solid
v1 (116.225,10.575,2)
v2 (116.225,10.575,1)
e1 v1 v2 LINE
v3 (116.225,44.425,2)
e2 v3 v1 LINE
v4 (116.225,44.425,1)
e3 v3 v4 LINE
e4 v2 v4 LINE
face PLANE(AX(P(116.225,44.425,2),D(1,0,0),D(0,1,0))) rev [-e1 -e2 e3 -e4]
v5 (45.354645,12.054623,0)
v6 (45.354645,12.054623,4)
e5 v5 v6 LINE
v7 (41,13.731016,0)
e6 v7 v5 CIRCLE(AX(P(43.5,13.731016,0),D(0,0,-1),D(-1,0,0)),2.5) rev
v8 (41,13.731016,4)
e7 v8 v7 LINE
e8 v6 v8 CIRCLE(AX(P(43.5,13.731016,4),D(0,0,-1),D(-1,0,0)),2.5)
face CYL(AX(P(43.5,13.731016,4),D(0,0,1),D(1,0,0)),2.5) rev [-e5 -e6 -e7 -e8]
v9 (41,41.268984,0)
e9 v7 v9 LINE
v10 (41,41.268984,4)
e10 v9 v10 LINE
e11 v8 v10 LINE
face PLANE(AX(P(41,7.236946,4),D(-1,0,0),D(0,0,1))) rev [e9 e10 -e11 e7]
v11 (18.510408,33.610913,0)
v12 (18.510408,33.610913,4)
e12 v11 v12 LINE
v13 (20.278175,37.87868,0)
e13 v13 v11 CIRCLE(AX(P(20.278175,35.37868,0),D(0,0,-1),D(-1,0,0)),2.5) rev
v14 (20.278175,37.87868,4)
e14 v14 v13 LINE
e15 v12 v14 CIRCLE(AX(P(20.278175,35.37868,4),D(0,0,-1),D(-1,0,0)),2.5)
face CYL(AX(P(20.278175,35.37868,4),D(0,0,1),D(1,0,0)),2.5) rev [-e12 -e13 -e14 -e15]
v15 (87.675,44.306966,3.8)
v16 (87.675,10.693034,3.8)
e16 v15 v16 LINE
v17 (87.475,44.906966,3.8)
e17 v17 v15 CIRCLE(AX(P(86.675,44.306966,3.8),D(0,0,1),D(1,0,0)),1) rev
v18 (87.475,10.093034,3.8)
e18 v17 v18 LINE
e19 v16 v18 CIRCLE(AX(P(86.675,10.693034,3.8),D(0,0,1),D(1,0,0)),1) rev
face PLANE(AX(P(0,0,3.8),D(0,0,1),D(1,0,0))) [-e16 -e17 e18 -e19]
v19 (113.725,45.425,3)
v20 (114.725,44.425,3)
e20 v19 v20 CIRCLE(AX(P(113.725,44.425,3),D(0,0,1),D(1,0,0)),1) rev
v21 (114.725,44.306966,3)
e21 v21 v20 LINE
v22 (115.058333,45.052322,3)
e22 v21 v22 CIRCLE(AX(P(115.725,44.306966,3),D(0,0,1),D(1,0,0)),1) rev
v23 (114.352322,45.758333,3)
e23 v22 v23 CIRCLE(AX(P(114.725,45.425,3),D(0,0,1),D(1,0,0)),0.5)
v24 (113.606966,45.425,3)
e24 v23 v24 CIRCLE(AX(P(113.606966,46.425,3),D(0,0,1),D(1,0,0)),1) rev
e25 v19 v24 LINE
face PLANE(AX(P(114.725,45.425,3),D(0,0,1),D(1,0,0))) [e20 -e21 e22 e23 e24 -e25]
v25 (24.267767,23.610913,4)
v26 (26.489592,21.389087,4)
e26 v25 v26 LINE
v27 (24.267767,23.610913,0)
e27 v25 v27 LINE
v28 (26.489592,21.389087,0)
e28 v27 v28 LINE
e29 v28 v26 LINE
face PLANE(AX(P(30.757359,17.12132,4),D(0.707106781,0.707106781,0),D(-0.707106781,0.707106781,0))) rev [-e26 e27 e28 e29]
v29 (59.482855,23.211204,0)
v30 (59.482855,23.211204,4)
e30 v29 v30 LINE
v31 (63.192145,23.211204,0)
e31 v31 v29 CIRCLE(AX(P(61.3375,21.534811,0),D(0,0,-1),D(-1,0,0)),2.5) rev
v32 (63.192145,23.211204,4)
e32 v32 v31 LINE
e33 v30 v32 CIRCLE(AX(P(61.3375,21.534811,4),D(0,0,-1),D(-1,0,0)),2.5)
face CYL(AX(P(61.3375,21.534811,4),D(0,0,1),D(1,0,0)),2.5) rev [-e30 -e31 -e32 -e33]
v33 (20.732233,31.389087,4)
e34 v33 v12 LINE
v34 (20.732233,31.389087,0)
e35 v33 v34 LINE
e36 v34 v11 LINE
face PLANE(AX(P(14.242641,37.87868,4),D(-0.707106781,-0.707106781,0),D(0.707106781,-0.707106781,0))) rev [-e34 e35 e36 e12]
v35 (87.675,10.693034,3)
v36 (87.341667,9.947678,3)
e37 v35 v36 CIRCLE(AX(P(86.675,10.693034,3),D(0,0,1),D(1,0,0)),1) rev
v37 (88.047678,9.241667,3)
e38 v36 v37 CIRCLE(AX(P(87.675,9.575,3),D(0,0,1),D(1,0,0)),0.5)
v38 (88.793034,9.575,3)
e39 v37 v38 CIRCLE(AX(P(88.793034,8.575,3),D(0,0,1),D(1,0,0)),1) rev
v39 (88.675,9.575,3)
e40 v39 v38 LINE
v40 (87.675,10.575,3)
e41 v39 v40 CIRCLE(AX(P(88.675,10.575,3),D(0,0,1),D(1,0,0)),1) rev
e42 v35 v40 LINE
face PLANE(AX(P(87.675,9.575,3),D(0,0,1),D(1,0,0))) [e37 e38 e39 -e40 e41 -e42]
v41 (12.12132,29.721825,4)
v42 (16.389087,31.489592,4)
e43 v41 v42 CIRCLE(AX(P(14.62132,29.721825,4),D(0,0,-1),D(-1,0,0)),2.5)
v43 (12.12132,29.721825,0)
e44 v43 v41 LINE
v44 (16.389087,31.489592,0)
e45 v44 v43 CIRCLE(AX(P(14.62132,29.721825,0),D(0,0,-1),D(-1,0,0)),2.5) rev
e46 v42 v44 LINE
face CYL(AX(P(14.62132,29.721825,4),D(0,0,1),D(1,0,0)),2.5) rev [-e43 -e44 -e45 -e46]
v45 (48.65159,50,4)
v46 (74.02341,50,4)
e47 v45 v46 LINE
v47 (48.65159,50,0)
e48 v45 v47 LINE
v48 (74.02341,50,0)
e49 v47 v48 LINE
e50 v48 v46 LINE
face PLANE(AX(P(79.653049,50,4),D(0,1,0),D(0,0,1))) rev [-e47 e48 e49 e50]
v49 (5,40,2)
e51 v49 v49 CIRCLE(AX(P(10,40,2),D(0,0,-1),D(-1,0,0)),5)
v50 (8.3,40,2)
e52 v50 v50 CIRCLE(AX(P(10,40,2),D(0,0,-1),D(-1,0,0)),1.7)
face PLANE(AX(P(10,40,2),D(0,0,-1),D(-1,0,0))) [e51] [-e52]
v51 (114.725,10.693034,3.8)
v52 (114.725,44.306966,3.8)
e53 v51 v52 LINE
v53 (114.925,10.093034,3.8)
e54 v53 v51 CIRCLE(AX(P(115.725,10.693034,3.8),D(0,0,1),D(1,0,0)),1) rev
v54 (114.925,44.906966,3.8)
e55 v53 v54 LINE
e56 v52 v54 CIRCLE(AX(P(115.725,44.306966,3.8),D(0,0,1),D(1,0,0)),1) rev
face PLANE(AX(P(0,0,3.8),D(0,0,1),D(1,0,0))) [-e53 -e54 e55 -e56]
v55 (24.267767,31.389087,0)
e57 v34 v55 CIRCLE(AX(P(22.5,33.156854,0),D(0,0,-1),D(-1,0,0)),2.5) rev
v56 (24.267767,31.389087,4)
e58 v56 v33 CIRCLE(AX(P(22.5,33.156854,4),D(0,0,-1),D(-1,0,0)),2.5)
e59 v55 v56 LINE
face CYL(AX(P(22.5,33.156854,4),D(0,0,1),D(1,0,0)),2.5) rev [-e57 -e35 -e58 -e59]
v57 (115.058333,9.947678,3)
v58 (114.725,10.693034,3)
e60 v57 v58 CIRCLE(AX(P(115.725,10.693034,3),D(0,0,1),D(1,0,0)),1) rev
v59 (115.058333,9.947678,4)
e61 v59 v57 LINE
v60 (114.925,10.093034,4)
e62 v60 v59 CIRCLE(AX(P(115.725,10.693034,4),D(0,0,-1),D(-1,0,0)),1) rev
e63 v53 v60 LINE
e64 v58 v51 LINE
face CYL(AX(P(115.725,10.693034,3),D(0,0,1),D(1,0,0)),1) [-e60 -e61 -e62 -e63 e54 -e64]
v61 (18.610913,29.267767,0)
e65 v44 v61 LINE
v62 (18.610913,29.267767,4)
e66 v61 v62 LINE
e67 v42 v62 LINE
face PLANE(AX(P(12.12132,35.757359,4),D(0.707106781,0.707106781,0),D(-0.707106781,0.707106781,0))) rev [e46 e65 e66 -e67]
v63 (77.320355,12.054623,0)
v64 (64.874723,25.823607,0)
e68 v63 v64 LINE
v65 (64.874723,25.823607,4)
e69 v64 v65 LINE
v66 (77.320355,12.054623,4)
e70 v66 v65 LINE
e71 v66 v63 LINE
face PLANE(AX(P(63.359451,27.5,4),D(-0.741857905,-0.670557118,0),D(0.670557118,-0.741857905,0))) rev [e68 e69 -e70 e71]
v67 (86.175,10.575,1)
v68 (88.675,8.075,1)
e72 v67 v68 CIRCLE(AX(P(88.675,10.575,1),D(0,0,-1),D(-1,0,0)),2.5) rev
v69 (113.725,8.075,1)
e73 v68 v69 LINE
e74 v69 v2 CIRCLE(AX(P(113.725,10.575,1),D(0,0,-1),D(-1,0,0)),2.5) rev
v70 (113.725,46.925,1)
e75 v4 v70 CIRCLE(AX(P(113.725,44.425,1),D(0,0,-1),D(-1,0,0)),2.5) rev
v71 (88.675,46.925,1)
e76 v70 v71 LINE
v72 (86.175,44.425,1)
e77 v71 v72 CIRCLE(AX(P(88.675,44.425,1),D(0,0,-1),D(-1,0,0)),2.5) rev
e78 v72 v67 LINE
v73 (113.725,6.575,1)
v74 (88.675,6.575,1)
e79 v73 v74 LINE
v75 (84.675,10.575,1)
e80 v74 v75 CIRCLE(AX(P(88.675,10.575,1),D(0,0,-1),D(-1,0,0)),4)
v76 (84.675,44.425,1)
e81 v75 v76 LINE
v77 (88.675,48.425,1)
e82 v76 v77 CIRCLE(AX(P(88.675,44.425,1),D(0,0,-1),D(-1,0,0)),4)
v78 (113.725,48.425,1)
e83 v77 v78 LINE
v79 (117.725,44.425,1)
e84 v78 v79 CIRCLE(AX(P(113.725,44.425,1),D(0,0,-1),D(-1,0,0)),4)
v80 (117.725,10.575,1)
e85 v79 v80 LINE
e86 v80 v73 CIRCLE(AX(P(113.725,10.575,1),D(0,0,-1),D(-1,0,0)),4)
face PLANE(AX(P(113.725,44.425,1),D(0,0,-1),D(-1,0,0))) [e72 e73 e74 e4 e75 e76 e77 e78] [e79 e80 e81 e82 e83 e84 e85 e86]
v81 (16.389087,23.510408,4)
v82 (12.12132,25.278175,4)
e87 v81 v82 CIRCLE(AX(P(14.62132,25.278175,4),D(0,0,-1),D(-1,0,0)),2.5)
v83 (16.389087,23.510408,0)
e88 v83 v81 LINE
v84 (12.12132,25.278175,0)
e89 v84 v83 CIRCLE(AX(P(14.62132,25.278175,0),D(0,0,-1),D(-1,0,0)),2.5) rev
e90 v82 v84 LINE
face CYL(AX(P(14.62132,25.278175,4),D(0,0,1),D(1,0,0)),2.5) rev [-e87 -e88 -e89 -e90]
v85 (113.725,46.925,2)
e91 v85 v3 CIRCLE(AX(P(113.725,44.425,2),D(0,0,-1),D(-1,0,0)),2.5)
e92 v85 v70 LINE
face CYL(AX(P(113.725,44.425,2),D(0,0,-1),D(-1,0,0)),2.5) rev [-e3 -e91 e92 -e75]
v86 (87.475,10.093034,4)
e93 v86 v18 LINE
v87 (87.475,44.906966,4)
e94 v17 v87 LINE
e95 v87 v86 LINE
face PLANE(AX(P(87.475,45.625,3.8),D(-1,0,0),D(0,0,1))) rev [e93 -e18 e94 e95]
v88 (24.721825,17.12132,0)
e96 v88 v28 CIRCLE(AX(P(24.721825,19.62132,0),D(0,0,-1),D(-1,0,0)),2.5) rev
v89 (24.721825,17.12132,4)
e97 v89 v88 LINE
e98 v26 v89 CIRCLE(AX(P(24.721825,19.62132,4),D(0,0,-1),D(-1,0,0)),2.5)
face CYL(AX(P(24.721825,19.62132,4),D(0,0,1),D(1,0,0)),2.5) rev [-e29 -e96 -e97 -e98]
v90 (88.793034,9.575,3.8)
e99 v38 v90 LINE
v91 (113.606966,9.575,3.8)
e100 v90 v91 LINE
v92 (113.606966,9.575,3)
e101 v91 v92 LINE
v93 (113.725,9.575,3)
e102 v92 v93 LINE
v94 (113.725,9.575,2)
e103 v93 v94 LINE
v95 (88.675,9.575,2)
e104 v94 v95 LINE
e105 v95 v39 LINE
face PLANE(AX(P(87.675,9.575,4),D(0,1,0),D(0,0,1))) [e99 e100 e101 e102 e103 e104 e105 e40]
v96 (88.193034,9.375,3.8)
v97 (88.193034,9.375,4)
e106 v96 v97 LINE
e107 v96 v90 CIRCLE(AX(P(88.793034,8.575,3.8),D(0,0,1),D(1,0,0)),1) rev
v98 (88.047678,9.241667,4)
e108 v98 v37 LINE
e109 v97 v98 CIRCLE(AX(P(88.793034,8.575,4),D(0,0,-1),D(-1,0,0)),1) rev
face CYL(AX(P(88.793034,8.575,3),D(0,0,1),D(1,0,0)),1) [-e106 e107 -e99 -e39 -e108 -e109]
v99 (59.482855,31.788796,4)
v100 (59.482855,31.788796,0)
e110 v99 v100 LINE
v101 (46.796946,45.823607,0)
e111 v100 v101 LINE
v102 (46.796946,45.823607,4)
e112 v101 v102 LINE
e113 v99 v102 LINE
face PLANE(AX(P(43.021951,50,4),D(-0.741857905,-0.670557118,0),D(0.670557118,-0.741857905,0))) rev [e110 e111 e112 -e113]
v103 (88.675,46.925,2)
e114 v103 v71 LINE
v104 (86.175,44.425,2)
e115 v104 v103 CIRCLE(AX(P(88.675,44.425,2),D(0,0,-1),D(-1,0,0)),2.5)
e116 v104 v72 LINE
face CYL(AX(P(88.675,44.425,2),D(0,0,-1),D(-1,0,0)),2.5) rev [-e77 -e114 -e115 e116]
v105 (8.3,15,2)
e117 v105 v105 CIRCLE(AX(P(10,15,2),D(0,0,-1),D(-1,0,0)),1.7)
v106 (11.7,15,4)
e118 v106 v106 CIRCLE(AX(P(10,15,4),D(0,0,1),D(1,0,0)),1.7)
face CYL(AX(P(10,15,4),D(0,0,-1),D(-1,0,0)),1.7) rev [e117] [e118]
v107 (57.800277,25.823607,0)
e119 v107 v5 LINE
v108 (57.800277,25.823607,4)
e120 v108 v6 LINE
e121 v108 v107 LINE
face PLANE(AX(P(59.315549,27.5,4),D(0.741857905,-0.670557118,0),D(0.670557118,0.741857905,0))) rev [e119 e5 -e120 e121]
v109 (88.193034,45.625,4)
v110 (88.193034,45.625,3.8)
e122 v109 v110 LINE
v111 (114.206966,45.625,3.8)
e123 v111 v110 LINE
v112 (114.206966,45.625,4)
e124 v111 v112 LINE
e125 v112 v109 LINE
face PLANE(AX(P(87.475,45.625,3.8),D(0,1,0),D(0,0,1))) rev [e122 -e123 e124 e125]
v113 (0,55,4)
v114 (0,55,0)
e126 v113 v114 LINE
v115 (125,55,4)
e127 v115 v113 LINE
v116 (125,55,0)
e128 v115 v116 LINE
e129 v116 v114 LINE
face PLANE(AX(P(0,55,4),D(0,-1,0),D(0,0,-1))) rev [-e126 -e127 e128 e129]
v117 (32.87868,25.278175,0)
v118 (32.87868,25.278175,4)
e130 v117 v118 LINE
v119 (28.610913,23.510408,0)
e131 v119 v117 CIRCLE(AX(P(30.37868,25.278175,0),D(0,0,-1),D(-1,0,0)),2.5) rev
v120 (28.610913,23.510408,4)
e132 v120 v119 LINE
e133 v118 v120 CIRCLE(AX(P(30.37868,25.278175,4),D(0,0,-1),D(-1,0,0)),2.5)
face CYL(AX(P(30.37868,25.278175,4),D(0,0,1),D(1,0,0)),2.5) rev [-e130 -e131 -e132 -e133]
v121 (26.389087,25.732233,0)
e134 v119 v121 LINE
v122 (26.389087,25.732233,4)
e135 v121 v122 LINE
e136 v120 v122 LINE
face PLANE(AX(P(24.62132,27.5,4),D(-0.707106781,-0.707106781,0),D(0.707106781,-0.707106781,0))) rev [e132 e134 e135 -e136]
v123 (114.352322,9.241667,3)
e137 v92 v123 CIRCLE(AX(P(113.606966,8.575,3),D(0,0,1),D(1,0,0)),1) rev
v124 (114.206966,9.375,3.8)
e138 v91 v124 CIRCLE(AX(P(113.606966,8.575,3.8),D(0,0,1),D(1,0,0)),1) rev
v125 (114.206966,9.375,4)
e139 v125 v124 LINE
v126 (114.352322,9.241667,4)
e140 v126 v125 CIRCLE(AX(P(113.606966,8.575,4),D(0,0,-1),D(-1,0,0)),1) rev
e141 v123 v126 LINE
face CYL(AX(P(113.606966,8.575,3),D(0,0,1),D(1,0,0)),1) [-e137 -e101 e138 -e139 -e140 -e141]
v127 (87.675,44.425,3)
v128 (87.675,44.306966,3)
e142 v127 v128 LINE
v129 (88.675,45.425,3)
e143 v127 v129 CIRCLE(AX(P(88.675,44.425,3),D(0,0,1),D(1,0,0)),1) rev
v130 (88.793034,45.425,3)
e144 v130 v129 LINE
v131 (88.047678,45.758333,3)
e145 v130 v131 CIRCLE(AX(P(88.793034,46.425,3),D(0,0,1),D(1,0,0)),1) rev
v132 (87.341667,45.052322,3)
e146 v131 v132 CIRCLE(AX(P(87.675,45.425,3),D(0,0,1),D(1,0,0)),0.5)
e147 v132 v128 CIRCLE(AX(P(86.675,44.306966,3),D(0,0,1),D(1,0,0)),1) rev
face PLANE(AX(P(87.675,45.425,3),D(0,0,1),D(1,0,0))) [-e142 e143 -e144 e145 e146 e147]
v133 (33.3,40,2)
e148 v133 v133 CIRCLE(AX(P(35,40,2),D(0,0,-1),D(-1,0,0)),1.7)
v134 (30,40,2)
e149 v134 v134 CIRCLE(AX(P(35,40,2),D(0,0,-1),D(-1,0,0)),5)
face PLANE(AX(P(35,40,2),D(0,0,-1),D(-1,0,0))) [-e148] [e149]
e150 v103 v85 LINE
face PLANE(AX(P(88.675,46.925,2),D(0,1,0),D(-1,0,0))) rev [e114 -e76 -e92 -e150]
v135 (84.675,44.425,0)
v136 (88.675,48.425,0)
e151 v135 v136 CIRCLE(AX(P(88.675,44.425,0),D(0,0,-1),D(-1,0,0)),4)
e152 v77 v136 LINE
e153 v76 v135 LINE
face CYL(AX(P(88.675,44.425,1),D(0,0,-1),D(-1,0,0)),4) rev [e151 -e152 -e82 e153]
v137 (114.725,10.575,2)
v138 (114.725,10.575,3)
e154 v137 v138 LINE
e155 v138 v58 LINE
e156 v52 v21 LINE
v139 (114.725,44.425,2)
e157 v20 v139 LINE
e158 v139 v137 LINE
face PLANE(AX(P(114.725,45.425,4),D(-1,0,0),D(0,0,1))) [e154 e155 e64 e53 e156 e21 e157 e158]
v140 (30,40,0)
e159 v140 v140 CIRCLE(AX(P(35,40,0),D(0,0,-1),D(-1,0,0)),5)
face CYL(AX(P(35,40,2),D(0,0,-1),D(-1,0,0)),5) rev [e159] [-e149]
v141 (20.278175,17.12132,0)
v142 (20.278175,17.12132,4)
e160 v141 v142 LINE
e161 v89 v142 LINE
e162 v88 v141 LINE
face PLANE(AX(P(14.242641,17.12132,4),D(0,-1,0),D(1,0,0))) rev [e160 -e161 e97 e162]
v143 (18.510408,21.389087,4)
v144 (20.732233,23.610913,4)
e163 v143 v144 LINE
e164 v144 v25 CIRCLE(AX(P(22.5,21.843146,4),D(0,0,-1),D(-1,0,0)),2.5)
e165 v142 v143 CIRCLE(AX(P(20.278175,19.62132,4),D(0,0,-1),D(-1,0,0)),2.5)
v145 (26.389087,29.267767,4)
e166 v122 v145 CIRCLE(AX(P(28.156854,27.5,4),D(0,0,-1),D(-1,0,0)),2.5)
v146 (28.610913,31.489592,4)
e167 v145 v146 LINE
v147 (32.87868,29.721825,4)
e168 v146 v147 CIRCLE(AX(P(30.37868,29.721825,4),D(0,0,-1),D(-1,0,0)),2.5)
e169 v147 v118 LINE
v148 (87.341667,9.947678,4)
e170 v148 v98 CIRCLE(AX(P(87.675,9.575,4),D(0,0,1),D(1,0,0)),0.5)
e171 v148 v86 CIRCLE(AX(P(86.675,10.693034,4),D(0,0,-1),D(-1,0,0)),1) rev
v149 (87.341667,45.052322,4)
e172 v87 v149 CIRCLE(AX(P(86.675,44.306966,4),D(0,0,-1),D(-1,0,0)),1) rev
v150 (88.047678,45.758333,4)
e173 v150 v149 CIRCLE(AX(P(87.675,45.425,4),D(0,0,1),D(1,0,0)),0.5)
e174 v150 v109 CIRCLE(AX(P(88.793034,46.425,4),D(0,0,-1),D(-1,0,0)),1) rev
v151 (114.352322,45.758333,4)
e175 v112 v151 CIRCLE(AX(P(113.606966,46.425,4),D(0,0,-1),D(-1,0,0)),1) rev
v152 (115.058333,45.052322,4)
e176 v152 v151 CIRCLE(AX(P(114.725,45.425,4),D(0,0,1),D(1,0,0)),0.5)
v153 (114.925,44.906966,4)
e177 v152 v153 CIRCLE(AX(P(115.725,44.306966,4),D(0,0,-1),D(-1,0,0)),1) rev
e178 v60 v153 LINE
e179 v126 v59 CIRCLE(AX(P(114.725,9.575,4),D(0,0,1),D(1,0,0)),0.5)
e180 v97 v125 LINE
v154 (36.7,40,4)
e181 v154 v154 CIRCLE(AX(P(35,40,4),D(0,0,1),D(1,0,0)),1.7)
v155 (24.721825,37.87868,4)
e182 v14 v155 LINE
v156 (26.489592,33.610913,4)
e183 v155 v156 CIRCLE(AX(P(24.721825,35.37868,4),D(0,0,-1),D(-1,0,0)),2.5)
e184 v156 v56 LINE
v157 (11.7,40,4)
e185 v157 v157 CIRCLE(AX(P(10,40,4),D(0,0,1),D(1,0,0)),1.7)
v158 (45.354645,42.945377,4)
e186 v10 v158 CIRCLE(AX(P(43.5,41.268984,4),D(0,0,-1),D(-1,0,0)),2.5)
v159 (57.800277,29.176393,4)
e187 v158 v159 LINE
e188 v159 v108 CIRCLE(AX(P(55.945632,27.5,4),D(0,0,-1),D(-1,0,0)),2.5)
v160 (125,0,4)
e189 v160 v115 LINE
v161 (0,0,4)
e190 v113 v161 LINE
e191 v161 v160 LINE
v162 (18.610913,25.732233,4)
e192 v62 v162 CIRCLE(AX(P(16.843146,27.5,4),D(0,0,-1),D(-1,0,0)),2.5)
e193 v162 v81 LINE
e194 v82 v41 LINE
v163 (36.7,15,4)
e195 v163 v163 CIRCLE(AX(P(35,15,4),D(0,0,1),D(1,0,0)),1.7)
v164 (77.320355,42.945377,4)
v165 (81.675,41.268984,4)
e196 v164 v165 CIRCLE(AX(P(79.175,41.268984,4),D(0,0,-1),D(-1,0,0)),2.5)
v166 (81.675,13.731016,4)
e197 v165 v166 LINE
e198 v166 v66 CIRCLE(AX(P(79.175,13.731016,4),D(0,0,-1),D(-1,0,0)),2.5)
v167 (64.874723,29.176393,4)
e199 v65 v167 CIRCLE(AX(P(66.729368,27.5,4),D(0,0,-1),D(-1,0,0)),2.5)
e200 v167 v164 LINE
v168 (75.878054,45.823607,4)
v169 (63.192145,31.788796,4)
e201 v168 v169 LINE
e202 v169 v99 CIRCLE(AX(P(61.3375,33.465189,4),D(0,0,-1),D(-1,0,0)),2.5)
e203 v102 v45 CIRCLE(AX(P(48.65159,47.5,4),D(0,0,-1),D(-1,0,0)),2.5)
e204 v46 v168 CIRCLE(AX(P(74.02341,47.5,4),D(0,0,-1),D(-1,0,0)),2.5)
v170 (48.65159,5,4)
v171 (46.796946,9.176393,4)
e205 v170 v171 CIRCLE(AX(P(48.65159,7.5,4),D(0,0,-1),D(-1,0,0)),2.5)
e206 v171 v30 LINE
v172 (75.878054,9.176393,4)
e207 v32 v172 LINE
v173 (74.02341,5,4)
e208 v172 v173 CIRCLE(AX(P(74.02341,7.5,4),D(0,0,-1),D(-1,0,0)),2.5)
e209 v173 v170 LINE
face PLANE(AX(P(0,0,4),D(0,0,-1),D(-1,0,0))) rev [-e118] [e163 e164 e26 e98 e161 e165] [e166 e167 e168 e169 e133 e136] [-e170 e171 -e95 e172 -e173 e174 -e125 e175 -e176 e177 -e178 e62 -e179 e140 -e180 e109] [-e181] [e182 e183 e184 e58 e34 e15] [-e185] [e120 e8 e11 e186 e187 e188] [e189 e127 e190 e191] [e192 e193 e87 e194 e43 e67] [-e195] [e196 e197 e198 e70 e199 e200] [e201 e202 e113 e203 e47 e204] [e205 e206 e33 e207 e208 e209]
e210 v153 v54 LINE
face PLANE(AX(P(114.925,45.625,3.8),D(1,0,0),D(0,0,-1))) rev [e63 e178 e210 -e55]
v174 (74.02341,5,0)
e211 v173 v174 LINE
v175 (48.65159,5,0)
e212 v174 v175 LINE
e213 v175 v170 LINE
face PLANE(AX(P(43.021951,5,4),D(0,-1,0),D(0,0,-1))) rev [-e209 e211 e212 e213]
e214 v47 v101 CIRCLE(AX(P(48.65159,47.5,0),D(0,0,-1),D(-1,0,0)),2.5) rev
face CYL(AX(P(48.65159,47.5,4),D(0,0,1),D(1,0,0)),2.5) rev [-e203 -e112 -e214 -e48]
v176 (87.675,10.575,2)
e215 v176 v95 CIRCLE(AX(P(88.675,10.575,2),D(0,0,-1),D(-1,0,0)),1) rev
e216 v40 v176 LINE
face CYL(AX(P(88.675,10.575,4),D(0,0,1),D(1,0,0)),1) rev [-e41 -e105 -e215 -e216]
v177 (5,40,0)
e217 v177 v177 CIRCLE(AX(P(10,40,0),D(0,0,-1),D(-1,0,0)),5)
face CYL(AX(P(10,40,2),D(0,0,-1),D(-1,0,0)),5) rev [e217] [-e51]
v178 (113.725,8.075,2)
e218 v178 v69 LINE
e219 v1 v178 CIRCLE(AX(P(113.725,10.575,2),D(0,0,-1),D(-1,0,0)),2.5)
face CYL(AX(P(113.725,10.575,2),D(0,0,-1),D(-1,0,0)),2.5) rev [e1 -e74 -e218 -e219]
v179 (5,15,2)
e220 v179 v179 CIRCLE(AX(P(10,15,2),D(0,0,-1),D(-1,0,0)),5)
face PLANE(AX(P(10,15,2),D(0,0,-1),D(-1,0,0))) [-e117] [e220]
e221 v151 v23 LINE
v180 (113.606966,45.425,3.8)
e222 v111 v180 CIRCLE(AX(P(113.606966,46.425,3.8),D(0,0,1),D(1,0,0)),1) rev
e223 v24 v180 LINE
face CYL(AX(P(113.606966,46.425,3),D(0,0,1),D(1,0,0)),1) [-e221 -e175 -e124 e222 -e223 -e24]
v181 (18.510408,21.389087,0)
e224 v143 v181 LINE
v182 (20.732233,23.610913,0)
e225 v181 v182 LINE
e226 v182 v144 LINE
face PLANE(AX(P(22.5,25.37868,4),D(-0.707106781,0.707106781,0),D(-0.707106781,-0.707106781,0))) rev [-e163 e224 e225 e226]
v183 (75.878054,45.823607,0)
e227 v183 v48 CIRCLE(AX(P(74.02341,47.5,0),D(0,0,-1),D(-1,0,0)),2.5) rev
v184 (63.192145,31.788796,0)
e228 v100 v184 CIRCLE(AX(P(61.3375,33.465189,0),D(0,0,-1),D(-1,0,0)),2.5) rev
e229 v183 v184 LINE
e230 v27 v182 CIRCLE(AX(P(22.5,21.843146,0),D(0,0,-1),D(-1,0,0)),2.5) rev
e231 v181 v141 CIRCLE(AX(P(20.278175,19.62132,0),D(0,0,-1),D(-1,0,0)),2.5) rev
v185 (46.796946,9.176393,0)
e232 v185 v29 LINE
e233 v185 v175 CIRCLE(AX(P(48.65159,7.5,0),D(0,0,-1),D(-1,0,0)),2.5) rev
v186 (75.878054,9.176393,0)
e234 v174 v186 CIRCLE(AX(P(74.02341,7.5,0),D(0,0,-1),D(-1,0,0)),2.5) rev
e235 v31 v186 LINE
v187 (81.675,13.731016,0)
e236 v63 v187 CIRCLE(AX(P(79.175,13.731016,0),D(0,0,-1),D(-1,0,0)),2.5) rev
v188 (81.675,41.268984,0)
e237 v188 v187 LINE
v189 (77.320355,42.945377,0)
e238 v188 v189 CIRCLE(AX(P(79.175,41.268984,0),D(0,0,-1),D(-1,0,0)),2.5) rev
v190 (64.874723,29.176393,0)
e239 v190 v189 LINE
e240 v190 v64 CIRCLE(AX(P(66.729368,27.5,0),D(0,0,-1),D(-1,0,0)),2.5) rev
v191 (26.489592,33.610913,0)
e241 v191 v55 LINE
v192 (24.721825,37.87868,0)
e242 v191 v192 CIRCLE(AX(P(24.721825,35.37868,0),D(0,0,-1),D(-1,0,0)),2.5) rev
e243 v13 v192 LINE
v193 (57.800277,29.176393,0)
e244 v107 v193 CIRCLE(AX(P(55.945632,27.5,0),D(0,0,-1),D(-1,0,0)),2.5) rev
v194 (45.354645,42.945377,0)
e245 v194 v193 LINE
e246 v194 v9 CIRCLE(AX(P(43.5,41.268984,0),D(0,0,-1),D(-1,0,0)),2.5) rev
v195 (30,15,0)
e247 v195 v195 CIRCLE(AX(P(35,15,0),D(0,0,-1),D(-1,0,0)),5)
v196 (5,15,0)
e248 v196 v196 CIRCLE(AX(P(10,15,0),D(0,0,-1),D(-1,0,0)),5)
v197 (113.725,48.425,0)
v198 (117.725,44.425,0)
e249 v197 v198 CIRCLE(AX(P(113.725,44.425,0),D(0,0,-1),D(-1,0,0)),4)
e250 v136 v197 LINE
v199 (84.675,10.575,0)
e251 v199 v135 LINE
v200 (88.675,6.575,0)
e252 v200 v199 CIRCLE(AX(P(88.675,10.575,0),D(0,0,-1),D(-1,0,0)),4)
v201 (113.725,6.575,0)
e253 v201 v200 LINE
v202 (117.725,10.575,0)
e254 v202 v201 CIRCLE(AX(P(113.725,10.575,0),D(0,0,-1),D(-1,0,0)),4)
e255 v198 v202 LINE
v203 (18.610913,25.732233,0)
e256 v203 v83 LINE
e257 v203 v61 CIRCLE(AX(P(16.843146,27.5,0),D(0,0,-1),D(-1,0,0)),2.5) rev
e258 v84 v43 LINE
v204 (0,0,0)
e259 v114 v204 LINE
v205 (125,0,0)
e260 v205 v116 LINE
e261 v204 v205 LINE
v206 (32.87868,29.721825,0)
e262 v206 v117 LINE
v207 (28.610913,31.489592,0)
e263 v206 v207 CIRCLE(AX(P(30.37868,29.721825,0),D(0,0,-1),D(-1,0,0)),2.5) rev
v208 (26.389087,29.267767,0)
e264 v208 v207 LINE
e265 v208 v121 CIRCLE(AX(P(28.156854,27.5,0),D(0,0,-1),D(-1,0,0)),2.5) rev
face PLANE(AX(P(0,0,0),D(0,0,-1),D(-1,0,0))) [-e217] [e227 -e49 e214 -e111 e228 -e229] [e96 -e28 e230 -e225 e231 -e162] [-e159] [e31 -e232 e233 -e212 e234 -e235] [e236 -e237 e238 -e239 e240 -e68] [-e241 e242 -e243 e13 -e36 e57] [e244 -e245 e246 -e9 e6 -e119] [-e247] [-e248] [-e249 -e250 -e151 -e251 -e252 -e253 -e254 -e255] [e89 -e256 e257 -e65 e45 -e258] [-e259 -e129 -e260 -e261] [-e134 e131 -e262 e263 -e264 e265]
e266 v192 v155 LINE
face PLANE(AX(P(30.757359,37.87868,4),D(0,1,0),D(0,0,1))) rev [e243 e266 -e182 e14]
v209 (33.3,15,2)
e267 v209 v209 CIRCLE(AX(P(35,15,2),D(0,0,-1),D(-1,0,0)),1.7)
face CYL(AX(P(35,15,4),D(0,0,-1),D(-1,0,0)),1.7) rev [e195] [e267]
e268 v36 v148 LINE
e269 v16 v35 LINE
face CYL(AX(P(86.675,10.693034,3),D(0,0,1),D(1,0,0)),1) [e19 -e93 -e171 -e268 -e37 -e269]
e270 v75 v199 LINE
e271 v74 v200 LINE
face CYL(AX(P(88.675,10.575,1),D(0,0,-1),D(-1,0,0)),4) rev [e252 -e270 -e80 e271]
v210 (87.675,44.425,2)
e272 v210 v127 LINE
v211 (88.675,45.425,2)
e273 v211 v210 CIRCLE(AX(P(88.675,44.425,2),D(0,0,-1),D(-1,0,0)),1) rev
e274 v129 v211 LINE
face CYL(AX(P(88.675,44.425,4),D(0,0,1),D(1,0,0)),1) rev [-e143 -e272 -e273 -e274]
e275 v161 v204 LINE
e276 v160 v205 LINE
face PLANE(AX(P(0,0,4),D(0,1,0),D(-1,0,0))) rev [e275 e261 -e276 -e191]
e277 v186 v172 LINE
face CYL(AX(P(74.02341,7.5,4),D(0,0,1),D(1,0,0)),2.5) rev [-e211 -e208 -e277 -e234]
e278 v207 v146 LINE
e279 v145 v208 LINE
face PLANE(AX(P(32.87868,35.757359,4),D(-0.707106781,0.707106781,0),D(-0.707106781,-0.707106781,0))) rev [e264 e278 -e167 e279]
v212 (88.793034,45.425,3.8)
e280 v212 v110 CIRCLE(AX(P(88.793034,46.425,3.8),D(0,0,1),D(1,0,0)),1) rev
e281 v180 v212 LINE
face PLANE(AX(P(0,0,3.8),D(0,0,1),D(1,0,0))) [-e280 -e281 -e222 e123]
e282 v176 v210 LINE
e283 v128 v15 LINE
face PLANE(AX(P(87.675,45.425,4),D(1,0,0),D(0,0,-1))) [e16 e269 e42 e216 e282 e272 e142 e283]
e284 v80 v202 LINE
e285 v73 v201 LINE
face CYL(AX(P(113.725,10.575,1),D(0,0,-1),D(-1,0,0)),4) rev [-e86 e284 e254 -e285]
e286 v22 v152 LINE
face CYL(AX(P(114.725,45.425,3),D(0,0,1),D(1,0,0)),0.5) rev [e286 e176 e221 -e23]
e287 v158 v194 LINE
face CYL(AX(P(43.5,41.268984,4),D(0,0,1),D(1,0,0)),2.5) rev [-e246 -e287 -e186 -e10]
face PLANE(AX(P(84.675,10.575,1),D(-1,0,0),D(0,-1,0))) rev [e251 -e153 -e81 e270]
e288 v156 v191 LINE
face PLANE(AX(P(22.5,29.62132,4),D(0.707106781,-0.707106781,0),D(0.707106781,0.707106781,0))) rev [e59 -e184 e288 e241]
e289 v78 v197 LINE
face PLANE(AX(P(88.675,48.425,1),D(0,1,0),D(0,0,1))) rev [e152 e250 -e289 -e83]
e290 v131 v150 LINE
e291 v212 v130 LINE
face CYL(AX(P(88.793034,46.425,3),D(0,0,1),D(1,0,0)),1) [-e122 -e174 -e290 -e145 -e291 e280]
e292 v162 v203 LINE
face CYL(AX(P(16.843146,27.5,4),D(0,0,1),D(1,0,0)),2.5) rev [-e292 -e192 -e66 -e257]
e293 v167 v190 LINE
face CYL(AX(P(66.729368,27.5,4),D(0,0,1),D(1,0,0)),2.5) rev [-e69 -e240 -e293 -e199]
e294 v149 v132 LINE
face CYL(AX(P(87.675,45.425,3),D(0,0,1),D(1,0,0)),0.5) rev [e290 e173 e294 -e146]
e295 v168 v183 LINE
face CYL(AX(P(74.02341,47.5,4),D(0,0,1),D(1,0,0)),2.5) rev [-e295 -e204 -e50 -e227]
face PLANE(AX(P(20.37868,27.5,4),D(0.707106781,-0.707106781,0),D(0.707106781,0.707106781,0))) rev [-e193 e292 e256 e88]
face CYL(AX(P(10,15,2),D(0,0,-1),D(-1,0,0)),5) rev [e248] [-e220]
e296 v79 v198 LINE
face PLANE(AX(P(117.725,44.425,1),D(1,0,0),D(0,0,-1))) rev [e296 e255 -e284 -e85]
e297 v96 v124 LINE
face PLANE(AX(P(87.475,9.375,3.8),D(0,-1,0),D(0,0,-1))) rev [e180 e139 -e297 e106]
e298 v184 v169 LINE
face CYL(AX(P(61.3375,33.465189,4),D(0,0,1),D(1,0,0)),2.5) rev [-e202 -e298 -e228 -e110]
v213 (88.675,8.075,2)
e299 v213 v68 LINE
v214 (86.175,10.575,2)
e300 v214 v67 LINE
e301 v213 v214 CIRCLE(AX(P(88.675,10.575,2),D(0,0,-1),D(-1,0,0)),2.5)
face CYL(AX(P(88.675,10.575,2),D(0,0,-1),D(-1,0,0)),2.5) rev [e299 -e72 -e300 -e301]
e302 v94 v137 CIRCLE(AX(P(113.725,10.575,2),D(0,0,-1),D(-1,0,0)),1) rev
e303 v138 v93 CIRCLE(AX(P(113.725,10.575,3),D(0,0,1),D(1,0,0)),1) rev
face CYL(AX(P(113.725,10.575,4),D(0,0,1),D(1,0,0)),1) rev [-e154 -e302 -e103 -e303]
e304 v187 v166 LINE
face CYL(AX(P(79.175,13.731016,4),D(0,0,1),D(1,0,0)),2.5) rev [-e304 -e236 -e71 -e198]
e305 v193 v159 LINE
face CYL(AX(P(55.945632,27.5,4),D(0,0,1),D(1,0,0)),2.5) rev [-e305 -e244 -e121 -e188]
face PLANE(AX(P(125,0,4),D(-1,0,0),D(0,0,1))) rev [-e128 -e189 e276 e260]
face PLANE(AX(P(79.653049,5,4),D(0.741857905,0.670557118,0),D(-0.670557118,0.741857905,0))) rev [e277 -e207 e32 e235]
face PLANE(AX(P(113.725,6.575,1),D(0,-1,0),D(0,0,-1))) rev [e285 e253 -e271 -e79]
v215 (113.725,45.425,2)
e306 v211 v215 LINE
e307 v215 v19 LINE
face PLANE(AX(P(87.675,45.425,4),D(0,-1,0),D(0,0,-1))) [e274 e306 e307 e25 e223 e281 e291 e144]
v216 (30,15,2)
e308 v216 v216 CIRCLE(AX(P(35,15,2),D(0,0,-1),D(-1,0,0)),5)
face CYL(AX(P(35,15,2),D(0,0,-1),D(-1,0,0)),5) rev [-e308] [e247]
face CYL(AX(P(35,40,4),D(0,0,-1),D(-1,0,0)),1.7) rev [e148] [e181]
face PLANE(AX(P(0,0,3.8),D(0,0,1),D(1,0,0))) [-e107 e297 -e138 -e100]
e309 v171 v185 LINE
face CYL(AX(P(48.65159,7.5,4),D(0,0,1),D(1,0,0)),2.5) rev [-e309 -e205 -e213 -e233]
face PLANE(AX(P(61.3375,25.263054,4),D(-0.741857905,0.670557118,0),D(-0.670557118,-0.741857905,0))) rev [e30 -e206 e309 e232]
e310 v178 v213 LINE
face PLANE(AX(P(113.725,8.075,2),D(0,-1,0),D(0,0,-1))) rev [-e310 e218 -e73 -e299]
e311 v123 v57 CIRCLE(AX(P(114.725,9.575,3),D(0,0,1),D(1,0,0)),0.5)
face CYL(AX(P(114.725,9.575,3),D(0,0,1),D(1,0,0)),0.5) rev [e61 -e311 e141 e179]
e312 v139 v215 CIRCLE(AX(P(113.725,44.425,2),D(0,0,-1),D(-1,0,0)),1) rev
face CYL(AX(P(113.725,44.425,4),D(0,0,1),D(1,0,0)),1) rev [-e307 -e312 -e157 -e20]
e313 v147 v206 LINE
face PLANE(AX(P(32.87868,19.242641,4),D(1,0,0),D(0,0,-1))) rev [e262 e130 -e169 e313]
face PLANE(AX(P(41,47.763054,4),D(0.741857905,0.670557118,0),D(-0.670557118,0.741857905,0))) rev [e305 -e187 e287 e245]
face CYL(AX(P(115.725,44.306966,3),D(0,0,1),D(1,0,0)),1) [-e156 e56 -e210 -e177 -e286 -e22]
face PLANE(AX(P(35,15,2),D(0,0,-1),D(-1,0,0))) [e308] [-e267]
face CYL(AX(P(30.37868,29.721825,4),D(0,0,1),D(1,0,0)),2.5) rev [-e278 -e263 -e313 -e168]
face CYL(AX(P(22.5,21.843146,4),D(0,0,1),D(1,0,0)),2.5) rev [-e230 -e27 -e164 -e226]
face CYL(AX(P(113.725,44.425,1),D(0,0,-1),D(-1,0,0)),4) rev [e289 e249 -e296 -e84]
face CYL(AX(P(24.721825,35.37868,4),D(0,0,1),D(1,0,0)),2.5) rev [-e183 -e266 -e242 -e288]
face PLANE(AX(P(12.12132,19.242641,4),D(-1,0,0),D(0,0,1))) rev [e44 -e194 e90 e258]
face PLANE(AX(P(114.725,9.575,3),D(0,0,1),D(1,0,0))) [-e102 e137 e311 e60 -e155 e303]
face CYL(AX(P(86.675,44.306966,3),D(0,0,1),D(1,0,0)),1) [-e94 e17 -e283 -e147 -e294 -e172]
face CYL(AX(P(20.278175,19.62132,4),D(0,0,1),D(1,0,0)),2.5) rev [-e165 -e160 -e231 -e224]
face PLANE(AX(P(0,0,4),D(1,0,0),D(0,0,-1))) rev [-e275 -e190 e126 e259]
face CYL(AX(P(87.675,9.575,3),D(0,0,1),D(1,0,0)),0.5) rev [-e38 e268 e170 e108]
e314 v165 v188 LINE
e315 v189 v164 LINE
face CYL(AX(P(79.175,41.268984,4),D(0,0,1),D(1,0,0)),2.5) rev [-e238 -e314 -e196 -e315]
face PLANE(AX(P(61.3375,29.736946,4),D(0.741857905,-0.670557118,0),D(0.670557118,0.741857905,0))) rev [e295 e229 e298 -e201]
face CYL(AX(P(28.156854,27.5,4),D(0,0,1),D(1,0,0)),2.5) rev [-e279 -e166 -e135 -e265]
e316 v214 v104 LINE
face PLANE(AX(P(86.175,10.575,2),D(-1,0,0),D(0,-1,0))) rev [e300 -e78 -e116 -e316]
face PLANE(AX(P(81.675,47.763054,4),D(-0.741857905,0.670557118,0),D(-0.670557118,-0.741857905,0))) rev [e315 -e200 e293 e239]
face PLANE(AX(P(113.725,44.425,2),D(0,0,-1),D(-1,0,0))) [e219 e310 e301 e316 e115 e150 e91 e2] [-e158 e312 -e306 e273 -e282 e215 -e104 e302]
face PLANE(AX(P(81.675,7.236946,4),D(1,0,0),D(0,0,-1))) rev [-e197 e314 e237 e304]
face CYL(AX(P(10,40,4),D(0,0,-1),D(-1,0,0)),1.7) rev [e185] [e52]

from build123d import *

# Parameters (mm, degrees)
SKETCH1_R           = 1.6999999999999995
SKETCH1_W           = 27.05000000000001
SKETCH1_H           = 35.849999999999994
BOSS_EXTRUDE1_DEPTH = 4
SKETCH2_R           = 0.49999999999999917
CUT_EXTRUDE1_DEPTH  = 1
FILLET1_R           = 1
FILLET2_R           = 1
SKETCH7_W           = 27.450000000000074
SKETCH7_H           = 36.250000000000014
CUT_EXTRUDE2_DEPTH  = 0.2
CUT_EXTRUDE3_DEPTH  = 2
CUT_EXTRUDE4_DEPTH  = 1
CUT_EXTRUDE5_DEPTH  = 137.6235704408284
CUT_EXTRUDE6_DEPTH  = 137.6235704408284
FILLET3_R           = 2.5
SKETCH12_R          = 4.999999999999999
SKETCH12_R_2        = 5.000000000000001
CUT_EXTRUDE7_DEPTH  = 2


with BuildPart() as part:
    # Sketch1 → Boss-Extrude1 (new body)
    with BuildSketch(Plane.XY):
        Polygon((0, 0), (125, 2.776e-14), (125, 54.99999999999999), (0, 54.99999999999999), align=None)
        with Locations((10, 39.99999999999999)):
            Circle(SKETCH1_R, mode=Mode.SUBTRACT)
        with Locations((35, 39.999999999999986)):
            Circle(SKETCH1_R, mode=Mode.SUBTRACT)
        with Locations((10, 15)):
            Circle(SKETCH1_R, mode=Mode.SUBTRACT)
        with Locations((35, 15.000000000000014)):
            Circle(SKETCH1_R, mode=Mode.SUBTRACT)
        with Locations((101.2, 27.500000000000007)):
            Rectangle(SKETCH1_W, SKETCH1_H, mode=Mode.SUBTRACT)
    extrude(amount=BOSS_EXTRUDE1_DEPTH)

    # Sketch2 → Cut-Extrude1 (cut)
    with BuildSketch(Plane.XY.offset(4)):
        with Locations((87.675, 45.425000000000004)):
            Circle(SKETCH2_R)
        with Locations((114.72500000000001, 45.425000000000004)):
            Circle(SKETCH2_R)
        with Locations((87.675, 9.575000000000006)):
            Circle(SKETCH2_R)
        with Locations((114.72500000000001, 9.575000000000006)):
            Circle(SKETCH2_R)
    extrude(amount=-CUT_EXTRUDE1_DEPTH, mode=Mode.SUBTRACT)

    # Fillet1
    # the kernel refuses this fillet: 1 mm, written as the material it adds along each edge
    with BuildSketch(Plane(origin=(114.72500000000001, 9.575000000000006, 0), x_dir=(-1, 0, 0), z_dir=(0, 0, 1))) as fillet1_piece_1_section:
        with BuildLine():
            CenterArc((FILLET1_R, -FILLET1_R), FILLET1_R, 90, 90.00000000000023)
            Line((0, -FILLET1_R), (0, 0))
            Line((0, 0), (FILLET1_R, 0))
        make_face()
    fillet1_piece_1 = extrude(amount=5.500000000000009, mode=Mode.PRIVATE)
    fillet1_piece_1 = split(fillet1_piece_1, bisect_by=Plane(origin=(114.10706425748403, 9.617383677219156, 4), z_dir=(0, 0, -1)), keep=Keep.TOP, mode=Mode.PRIVATE)
    fillet1_piece_1 = fillet1_piece_1 - Plane(origin=(114.72500000000001, 9.575000000000006, 1.5000000000000009), x_dir=(1, 0, 0), z_dir=(0, 0, 1)) * Cylinder(0.49999999999999917, 16, mode=Mode.PRIVATE)
    add(fillet1_piece_1)
    with BuildSketch(Plane(origin=(114.72500000000001, 9.575000000000006, 0), x_dir=(-1, 0, 0), z_dir=(0, 0, 1))) as fillet1_piece_2:
        with BuildLine():
            CenterArc((FILLET1_R, -FILLET1_R), FILLET1_R, 90, 90.00000000000023)
            Line((0, -FILLET1_R), (0, 0))
            Line((0, 0), (FILLET1_R, 0))
        make_face()
    extrude(amount=3)
    with BuildSketch(Plane(origin=(87.675, 9.575000000000006, 0), x_dir=(0, 1, 0), z_dir=(0, 0, 1))) as fillet1_piece_3_section:
        with BuildLine():
            CenterArc((FILLET1_R, -FILLET1_R), FILLET1_R, 90, 90)
            Line((0, -FILLET1_R), (0, 0))
            Line((0, 0), (FILLET1_R, 0))
        make_face()
    fillet1_piece_3 = extrude(amount=5.5, mode=Mode.PRIVATE)
    fillet1_piece_3 = split(fillet1_piece_3, bisect_by=Plane(origin=(87.71738367721915, 10.192935742515996, 4), z_dir=(0, 0, -1)), keep=Keep.TOP, mode=Mode.PRIVATE)
    fillet1_piece_3 = fillet1_piece_3 - Plane(origin=(87.675, 9.575000000000006, 1.5000000000000022), x_dir=(1, 0, 0), z_dir=(0, 0, 1)) * Cylinder(0.49999999999999917, 15, mode=Mode.PRIVATE)
    add(fillet1_piece_3)
    with BuildSketch(Plane(origin=(87.675, 9.575000000000006, 0), x_dir=(0, 1, 0), z_dir=(0, 0, 1))) as fillet1_piece_4:
        with BuildLine():
            CenterArc((FILLET1_R, -FILLET1_R), FILLET1_R, 90, 90)
            Line((0, -FILLET1_R), (0, 0))
            Line((0, 0), (FILLET1_R, 0))
        make_face()
    extrude(amount=3)
    with BuildSketch(Plane(origin=(114.72500000000001, 45.425000000000004, 0), x_dir=(0, -1, 0), z_dir=(0, 0, 1))) as fillet1_piece_5_section:
        with BuildLine():
            CenterArc((FILLET1_R, -FILLET1_R), FILLET1_R, 90, 90)
            Line((0, -FILLET1_R), (0, 0))
            Line((0, 0), (FILLET1_R, 0))
        make_face()
    fillet1_piece_5 = extrude(amount=5.5, mode=Mode.PRIVATE)
    fillet1_piece_5 = split(fillet1_piece_5, bisect_by=Plane(origin=(114.68261632278086, 44.807064257484015, 4), z_dir=(0, 0, -1)), keep=Keep.TOP, mode=Mode.PRIVATE)
    fillet1_piece_5 = fillet1_piece_5 - Plane(origin=(114.72500000000001, 45.425000000000004, 1.5000000000000009), x_dir=(1, 0, 0), z_dir=(0, 0, 1)) * Cylinder(0.49999999999999917, 15, mode=Mode.PRIVATE)
    add(fillet1_piece_5)
    with BuildSketch(Plane(origin=(114.72500000000001, 45.425000000000004, 0), x_dir=(0, -1, 0), z_dir=(0, 0, 1))) as fillet1_piece_6:
        with BuildLine():
            CenterArc((FILLET1_R, -FILLET1_R), FILLET1_R, 90, 90)
            Line((0, -FILLET1_R), (0, 0))
            Line((0, 0), (FILLET1_R, 0))
        make_face()
    extrude(amount=3)
    with BuildSketch(Plane(origin=(87.675, 45.425000000000004, 0), x_dir=(0, -1, 0), z_dir=(0, 0, 1))) as fillet1_piece_7_section:
        with BuildLine():
            CenterArc((FILLET1_R, FILLET1_R), FILLET1_R, 180, 90)
            Line((7.11e-15, FILLET1_R), (0, 0))
            Line((0, 0), (FILLET1_R, 0))
        make_face()
    fillet1_piece_7 = extrude(amount=5.500000000000018, mode=Mode.PRIVATE)
    fillet1_piece_7 = split(fillet1_piece_7, bisect_by=Plane(origin=(87.71738367721916, 44.807064257484015, 4), z_dir=(0, 0, -1)), keep=Keep.TOP, mode=Mode.PRIVATE)
    fillet1_piece_7 = fillet1_piece_7 - Plane(origin=(87.675, 45.425000000000004, 1.5), x_dir=(1, 0, 0), z_dir=(0, 0, 1)) * Cylinder(0.49999999999999917, 16, mode=Mode.PRIVATE)
    add(fillet1_piece_7)
    with BuildSketch(Plane(origin=(87.675, 45.425000000000004, 0), x_dir=(0, -1, 0), z_dir=(0, 0, 1))) as fillet1_piece_8:
        with BuildLine():
            CenterArc((FILLET1_R, FILLET1_R), FILLET1_R, 180, 90)
            Line((7.11e-15, FILLET1_R), (0, 0))
            Line((0, 0), (FILLET1_R, 0))
        make_face()
    extrude(amount=3)

    # Fillet2
    # the kernel refuses this fillet: 1 mm, written as the material it takes off along each edge
    with BuildSketch(Plane(origin=(114.24714054305846, 9.722140543058465, 5.642166576865002), x_dir=(-0.9745882982080014, -0.22400368076447263, 0), z_dir=(0, 0, -1))) as fillet2_piece_1:
        with BuildLine():
            CenterArc((0.8808703115104601, -0.9745882982080014), FILLET2_R, 102.94429793424341, 48.189685104221226)
            Line((0.00511929604450839, -0.49182525186917403), (-0.08245580550209228, -0.44354894723529276))
            ThreePointArc((-0.08245580550209228, -0.44354894723529276), (-0.03277787842748482, -0.24628044612821973), (-0.08655124233769046, -0.05008874573995264))
            Line((-0.08655124233769046, -0.05008874573995264), (0.03178284057550912, 0.09481482502727105))
            ThreePointArc((0.03178284057550912, 0.09481482502727105), (0.5194317184430866, 0.07101878188551296), (0.6344662626695403, 0.09745882982079979))
            Line((0.6344662626695403, 0.09745882982079979), (0.6568666307459875, 0))
        make_face()
    extrude(amount=2.6421665768650016, mode=Mode.SUBTRACT)
    with BuildSketch(Plane(origin=(114.57785945694152, 10.052859456941535, 5.642166576864939), x_dir=(0.22400368076451158, 0.9745882982079924, 0), z_dir=(0, 0, -1))) as fillet2_piece_2:
        with BuildLine():
            CenterArc((0.880870311510496, 0.9745882982079924), FILLET2_R, 208.86601696153332, 48.189685104220985)
            Line((0.00511929604452377, 0.49182525186919485), (-0.08245580550207285, 0.44354894723531935))
            ThreePointArc((-0.08245580550207285, 0.44354894723531935), (-0.03277787842748298, 0.2462804461282338), (-0.08655124233769111, 0.05008874573996035))
            Line((-0.08655124233769111, 0.05008874573996035), (0.03178284057550186, -0.09481482502727152))
            ThreePointArc((0.03178284057550186, -0.09481482502727152), (0.5194317184430818, -0.0710187818855023), (0.6344662626695345, -0.09745882982079371))
            Line((0.6344662626695345, -0.09745882982079371), (0.6568666307459844, -1e-17))
        make_face()
    extrude(amount=2.6421665768649394, mode=Mode.SUBTRACT)
    with BuildSketch(Plane(origin=(87.82214054305847, 10.052859456941533, 5.6421665768649705), x_dir=(-0.22400368076448748, 0.974588298207998, 0), z_dir=(0, 0, -1))) as fillet2_piece_3:
        with BuildLine():
            CenterArc((0.8808703115104791, -0.9745882982079979), FILLET2_R, 102.94429793424429, 48.189685104221056)
            Line((0.00511929604451708, -0.49182525186917914), (-0.08245580550207834, -0.4435489472353014))
            ThreePointArc((-0.08245580550207834, -0.4435489472353014), (-0.03277787842748734, -0.24628044612823258), (-0.08655124233769235, -0.05008874573995822))
            Line((-0.08655124233769235, -0.05008874573995822), (0.03178284057550421, 0.09481482502727073))
            ThreePointArc((0.03178284057550421, 0.09481482502727073), (0.5194317184430803, 0.07101878188550331), (0.6344662626695442, 0.09745882982079428))
            Line((0.6344662626695442, 0.09745882982079428), (0.6568666307459916, 1e-17))
        make_face()
    extrude(amount=2.6421665768649705, mode=Mode.SUBTRACT)
    with BuildSketch(Plane(origin=(88.15285945694153, 9.722140543058465, 5.642166576865002), x_dir=(0.9745882982080024, -0.22400368076446792, 0), z_dir=(0, 0, -1))) as fillet2_piece_4:
        with BuildLine():
            CenterArc((0.8808703115104692, 0.9745882982080024), FILLET2_R, 208.86601696153488, 48.18968510422201)
            Line((0.00511929604450721, 0.4918252518691792), (-0.08245580550209324, 0.4435489472352975))
            ThreePointArc((-0.08245580550209324, 0.4435489472352975), (-0.0327778784274852, 0.246280446128223), (-0.0865512423376907, 0.05008874573995222))
            Line((-0.0865512423376907, 0.05008874573995222), (0.03178284057550957, -0.0948148250272709))
            ThreePointArc((0.03178284057550957, -0.0948148250272709), (0.5194317184430869, -0.07101878188551045), (0.6344662626695546, -0.09745882982079991))
            Line((0.6344662626695546, -0.09745882982079991), (0.6568666307460013, -2e-17))
        make_face()
    extrude(amount=2.6421665768650016, mode=Mode.SUBTRACT)
    with BuildSketch(Plane(origin=(114.57785945694152, 44.94714054305846, 5.642166576864965), x_dir=(0.22400368076451097, -0.9745882982079925, 0), z_dir=(0, 0, -1))) as fillet2_piece_5:
        with BuildLine():
            CenterArc((0.8808703115104971, -0.9745882982079926), FILLET2_R, 102.94429793424567, 48.189685104220956)
            Line((0.00511929604452519, -0.4918252518691944), (-0.08245580550206966, -0.44354894723531846))
            ThreePointArc((-0.08245580550206966, -0.44354894723531846), (-0.03277787842748659, -0.24628044612823458), (-0.08655124233769461, -0.0500887457399611))
            Line((-0.08655124233769461, -0.0500887457399611), (0.03178284057550539, 0.0948148250272723))
            ThreePointArc((0.03178284057550539, 0.0948148250272723), (0.5194317184430904, 0.07101878188550396), (0.6344662626695363, 0.09745882982079372))
            Line((0.6344662626695363, 0.09745882982079372), (0.6568666307459862, 1e-17))
        make_face()
    extrude(amount=2.642166576864965, mode=Mode.SUBTRACT)
    with BuildSketch(Plane(origin=(114.24714054305846, 45.277859456941535, 5.6421665768650096), x_dir=(-0.974588298207999, 0.22400368076448335, 0), z_dir=(0, 0, -1))) as fillet2_piece_6:
        with BuildLine():
            CenterArc((0.8808703115104871, 0.974588298207999), FILLET2_R, 208.86601696153414, 48.18968510422178)
            Line((0.00511929604451658, 0.49182525186918613), (-0.08245580550208544, 0.4435489472353023))
            ThreePointArc((-0.08245580550208544, 0.4435489472353023), (-0.03277787842748132, 0.24628044612822356), (-0.0865512423376907, 0.05008874573995013))
            Line((-0.0865512423376907, 0.05008874573995013), (0.03178284057550808, -0.09481482502727141))
            ThreePointArc((0.03178284057550808, -0.09481482502727141), (0.5194317184430862, -0.07101878188551694), (0.6344662626695551, -0.09745882982080127))
            Line((0.6344662626695551, -0.09745882982080127), (0.6568666307460037, 1e-17))
        make_face()
    extrude(amount=2.6421665768650096, mode=Mode.SUBTRACT)
    with BuildSketch(Plane(origin=(87.82214054305847, 44.94714054305846, 5.642166576864957), x_dir=(-0.22400368076448568, -0.9745882982079984, 0), z_dir=(0, 0, -1))) as fillet2_piece_7:
        with BuildLine():
            CenterArc((0.8808703115104826, 0.9745882982079985), FILLET2_R, 208.86601696153457, 48.18968510422121)
            Line((0.00511929604451617, 0.49182525186917914), (-0.08245580550207744, 0.4435489472353009))
            ThreePointArc((-0.08245580550207744, 0.4435489472353009), (-0.03277787842749299, 0.24628044612823374), (-0.08655124233769591, 0.05008874573995886))
            Line((-0.08655124233769591, 0.05008874573995886), (0.03178284057550785, -0.09481482502727148))
            ThreePointArc((0.03178284057550785, -0.09481482502727148), (0.5194317184430822, -0.07101878188550274), (0.6344662626695495, -0.09745882982079429))
            Line((0.6344662626695495, -0.09745882982079429), (0.6568666307459968, 0))
        make_face()
    extrude(amount=2.642166576864957, mode=Mode.SUBTRACT)
    with BuildSketch(Plane(origin=(88.15285945694153, 45.277859456941535, 5.642166576864975), x_dir=(0.974588298207998, 0.22400368076448807, 0), z_dir=(0, 0, -1))) as fillet2_piece_8:
        with BuildLine():
            CenterArc((0.8808703115104781, -0.974588298207998), FILLET2_R, 102.94429793424433, 48.189685104220985)
            Line((0.00511929604451736, -0.4918252518691792), (-0.08245580550208488, -0.4435489472352958))
            ThreePointArc((-0.08245580550208488, -0.4435489472352958), (-0.03277787842748014, -0.24628044612822372), (-0.08655124233769046, -0.05008874573995056))
            Line((-0.08655124233769046, -0.05008874573995056), (0.03178284057550762, 0.09481482502727157))
            ThreePointArc((0.03178284057550762, 0.09481482502727157), (0.5194317184430874, 0.07101878188551251), (0.6344662626695409, 0.09745882982080117))
            Line((0.6344662626695409, 0.09745882982080117), (0.65686663074599, 0))
        make_face()
    extrude(amount=2.642166576864975, mode=Mode.SUBTRACT)

    # Sketch7 → Cut-Extrude2 (cut)
    with BuildSketch(Plane.XY.offset(4)):
        with Locations((101.20000000000002, 27.500000000000007)):
            Rectangle(SKETCH7_W, SKETCH7_H)
    extrude(amount=-CUT_EXTRUDE2_DEPTH, mode=Mode.SUBTRACT)

    # Sketch8 → Cut-Extrude3 (cut)
    with BuildSketch(Plane(origin=(0, 0, 0), x_dir=(-1, 0, 0), z_dir=(0, 0, -1))):
        with BuildLine():
            Line((-116.22500000000001, 44.425000000000004), (-116.225, 10.575000000000008))
            ThreePointArc((-116.225, 10.575000000000008), (-115.49276695296636, 8.80723304703365), (-113.72500000000001, 8.075000000000008))
            Line((-113.72500000000001, 8.075000000000008), (-88.675, 8.075000000000008))
            ThreePointArc((-88.675, 8.075000000000008), (-86.90723304703363, 8.80723304703364), (-86.175, 10.575000000000008))
            Line((-86.175, 10.575000000000008), (-86.17499999999998, 44.425000000000004))
            ThreePointArc((-86.17499999999998, 44.425000000000004), (-86.90723304703361, 46.19276695296638), (-88.675, 46.92500000000001))
            Line((-88.675, 46.92500000000001), (-113.72500000000001, 46.925000000000004))
            ThreePointArc((-113.72500000000001, 46.925000000000004), (-115.49276695296638, 46.19276695296637), (-116.22500000000001, 44.425000000000004))
        make_face()
    extrude(amount=-CUT_EXTRUDE3_DEPTH, mode=Mode.SUBTRACT)

    # Sketch9 → Cut-Extrude4 (cut)
    with BuildSketch(Plane(origin=(0, 0, 0), x_dir=(-1, 0, 0), z_dir=(0, 0, -1))):
        with BuildLine():
            Line((-117.72500000000001, 44.425000000000004), (-117.72500000000001, 10.575000000000008))
            ThreePointArc((-117.72500000000001, 10.575000000000008), (-116.5534271247462, 7.746572875253818), (-113.72500000000001, 6.575000000000006))
            Line((-113.72500000000001, 6.575000000000006), (-88.675, 6.575000000000006))
            ThreePointArc((-88.675, 6.575000000000006), (-85.8465728752538, 7.7465728752538165), (-84.675, 10.575000000000008))
            Line((-84.675, 10.575000000000008), (-84.67499999999998, 44.425000000000004))
            ThreePointArc((-84.67499999999998, 44.425000000000004), (-85.8465728752538, 47.2534271247462), (-88.675, 48.42500000000001))
            Line((-88.675, 48.42500000000001), (-113.72500000000001, 48.42500000000001))
            ThreePointArc((-113.72500000000001, 48.42500000000001), (-116.55342712474621, 47.253427124746196), (-117.72500000000001, 44.425000000000004))
        make_face()
    extrude(amount=-CUT_EXTRUDE4_DEPTH, mode=Mode.SUBTRACT)

    # Sketch10 → Cut-Extrude5 (cut, through all)
    with BuildSketch(Plane(origin=(0, 0, 0), x_dir=(-1, 0, 0), z_dir=(0, 0, -1))):
        Polygon((-32.87867965644036, 35.7573593128807), (-24.621320343559653, 27.499999999999996), (-32.87867965644036, 19.242640687119284), align=None)
        Polygon((-30.75735931288072, 37.87867965644035), (-14.242640687119303, 37.87867965644035), (-22.50000000000001, 29.62132034355964), align=None)
        Polygon((-30.75735931288072, 17.121320343559645), (-22.500000000000007, 25.378679656440358), (-14.242640687119293, 17.12132034355965), align=None)
        Polygon((-12.121320343559654, 35.7573593128807), (-20.378679656440358, 27.499999999999996), (-12.121320343559654, 19.24264068711929), align=None)
    extrude(amount=-CUT_EXTRUDE5_DEPTH, mode=Mode.SUBTRACT)

    # Sketch11 → Cut-Extrude6 (cut, through all)
    with BuildSketch(Plane(origin=(0, 0, 0), x_dir=(-1, 0, 0), z_dir=(0, 0, -1))):
        Polygon((-81.67500000000001, 47.76305409311363), (-63.359450550280044, 27.49999999999998), (-81.67500000000001, 7.236945906886298), align=None)
        Polygon((-79.65304944971997, 49.99999999999999), (-43.02195055028005, 49.99999999999999), (-61.337500000000006, 29.73694590688633), align=None)
        Polygon((-79.65304944971993, 4.999999999999997), (-61.33750000000001, 25.263054093113627), (-43.02195055028008, 4.999999999999997), align=None)
        Polygon((-41, 47.76305409311365), (-59.31554944971996, 27.499999999999986), (-41, 7.236945906886325), align=None)
    extrude(amount=-CUT_EXTRUDE6_DEPTH, mode=Mode.SUBTRACT)

    # Fillet3
    fillet3_edges = [part.edges().sort_by_distance(p)[0] for p in [
        (22.50000000000001, 29.62132034355964, 2),
        (30.75735931288072, 37.87867965644035, 2),
        (14.242640687119303, 37.87867965644035, 2),
        (14.242640687119293, 17.12132034355965, 2),
        (30.75735931288072, 17.121320343559645, 2),
        (22.500000000000007, 25.378679656440358, 2),
        (12.121320343559654, 35.7573593128807, 2),
        (12.121320343559654, 19.24264068711929, 2),
        (20.378679656440358, 27.499999999999996, 2),
        (32.87867965644036, 19.242640687119284, 2),
        (32.87867965644036, 35.7573593128807, 2),
        (24.621320343559653, 27.499999999999996, 2),
        (61.337500000000006, 29.73694590688633, 2),
        (79.65304944971997, 49.99999999999999, 2),
        (43.02195055028005, 49.99999999999999, 2),
        (43.02195055028008, 4.999999999999997, 2),
        (79.65304944971993, 4.999999999999997, 2),
        (61.33750000000001, 25.263054093113627, 2),
        (41, 47.76305409311365, 2),
        (41, 7.236945906886325, 2),
        (59.31554944971996, 27.499999999999986, 2),
        (81.67500000000001, 7.236945906886298, 2),
        (81.67500000000001, 47.76305409311363, 2),
        (63.359450550280044, 27.49999999999998, 2),
    ]]
    fillet(fillet3_edges, radius=FILLET3_R)

    # Sketch12 → Cut-Extrude7 (cut)
    with BuildSketch(Plane(origin=(0, 0, 0), x_dir=(-1, 0, 0), z_dir=(0, 0, -1))):
        with Locations((-35, 39.999999999999986)):
            Circle(SKETCH12_R)
        with Locations((-10, 39.99999999999999)):
            Circle(SKETCH12_R)
        with Locations((-35, 15.000000000000014)):
            Circle(SKETCH12_R_2)
        with Locations((-10, 15)):
            Circle(SKETCH12_R_2)
    extrude(amount=-CUT_EXTRUDE7_DEPTH, mode=Mode.SUBTRACT)


solid = part.part
